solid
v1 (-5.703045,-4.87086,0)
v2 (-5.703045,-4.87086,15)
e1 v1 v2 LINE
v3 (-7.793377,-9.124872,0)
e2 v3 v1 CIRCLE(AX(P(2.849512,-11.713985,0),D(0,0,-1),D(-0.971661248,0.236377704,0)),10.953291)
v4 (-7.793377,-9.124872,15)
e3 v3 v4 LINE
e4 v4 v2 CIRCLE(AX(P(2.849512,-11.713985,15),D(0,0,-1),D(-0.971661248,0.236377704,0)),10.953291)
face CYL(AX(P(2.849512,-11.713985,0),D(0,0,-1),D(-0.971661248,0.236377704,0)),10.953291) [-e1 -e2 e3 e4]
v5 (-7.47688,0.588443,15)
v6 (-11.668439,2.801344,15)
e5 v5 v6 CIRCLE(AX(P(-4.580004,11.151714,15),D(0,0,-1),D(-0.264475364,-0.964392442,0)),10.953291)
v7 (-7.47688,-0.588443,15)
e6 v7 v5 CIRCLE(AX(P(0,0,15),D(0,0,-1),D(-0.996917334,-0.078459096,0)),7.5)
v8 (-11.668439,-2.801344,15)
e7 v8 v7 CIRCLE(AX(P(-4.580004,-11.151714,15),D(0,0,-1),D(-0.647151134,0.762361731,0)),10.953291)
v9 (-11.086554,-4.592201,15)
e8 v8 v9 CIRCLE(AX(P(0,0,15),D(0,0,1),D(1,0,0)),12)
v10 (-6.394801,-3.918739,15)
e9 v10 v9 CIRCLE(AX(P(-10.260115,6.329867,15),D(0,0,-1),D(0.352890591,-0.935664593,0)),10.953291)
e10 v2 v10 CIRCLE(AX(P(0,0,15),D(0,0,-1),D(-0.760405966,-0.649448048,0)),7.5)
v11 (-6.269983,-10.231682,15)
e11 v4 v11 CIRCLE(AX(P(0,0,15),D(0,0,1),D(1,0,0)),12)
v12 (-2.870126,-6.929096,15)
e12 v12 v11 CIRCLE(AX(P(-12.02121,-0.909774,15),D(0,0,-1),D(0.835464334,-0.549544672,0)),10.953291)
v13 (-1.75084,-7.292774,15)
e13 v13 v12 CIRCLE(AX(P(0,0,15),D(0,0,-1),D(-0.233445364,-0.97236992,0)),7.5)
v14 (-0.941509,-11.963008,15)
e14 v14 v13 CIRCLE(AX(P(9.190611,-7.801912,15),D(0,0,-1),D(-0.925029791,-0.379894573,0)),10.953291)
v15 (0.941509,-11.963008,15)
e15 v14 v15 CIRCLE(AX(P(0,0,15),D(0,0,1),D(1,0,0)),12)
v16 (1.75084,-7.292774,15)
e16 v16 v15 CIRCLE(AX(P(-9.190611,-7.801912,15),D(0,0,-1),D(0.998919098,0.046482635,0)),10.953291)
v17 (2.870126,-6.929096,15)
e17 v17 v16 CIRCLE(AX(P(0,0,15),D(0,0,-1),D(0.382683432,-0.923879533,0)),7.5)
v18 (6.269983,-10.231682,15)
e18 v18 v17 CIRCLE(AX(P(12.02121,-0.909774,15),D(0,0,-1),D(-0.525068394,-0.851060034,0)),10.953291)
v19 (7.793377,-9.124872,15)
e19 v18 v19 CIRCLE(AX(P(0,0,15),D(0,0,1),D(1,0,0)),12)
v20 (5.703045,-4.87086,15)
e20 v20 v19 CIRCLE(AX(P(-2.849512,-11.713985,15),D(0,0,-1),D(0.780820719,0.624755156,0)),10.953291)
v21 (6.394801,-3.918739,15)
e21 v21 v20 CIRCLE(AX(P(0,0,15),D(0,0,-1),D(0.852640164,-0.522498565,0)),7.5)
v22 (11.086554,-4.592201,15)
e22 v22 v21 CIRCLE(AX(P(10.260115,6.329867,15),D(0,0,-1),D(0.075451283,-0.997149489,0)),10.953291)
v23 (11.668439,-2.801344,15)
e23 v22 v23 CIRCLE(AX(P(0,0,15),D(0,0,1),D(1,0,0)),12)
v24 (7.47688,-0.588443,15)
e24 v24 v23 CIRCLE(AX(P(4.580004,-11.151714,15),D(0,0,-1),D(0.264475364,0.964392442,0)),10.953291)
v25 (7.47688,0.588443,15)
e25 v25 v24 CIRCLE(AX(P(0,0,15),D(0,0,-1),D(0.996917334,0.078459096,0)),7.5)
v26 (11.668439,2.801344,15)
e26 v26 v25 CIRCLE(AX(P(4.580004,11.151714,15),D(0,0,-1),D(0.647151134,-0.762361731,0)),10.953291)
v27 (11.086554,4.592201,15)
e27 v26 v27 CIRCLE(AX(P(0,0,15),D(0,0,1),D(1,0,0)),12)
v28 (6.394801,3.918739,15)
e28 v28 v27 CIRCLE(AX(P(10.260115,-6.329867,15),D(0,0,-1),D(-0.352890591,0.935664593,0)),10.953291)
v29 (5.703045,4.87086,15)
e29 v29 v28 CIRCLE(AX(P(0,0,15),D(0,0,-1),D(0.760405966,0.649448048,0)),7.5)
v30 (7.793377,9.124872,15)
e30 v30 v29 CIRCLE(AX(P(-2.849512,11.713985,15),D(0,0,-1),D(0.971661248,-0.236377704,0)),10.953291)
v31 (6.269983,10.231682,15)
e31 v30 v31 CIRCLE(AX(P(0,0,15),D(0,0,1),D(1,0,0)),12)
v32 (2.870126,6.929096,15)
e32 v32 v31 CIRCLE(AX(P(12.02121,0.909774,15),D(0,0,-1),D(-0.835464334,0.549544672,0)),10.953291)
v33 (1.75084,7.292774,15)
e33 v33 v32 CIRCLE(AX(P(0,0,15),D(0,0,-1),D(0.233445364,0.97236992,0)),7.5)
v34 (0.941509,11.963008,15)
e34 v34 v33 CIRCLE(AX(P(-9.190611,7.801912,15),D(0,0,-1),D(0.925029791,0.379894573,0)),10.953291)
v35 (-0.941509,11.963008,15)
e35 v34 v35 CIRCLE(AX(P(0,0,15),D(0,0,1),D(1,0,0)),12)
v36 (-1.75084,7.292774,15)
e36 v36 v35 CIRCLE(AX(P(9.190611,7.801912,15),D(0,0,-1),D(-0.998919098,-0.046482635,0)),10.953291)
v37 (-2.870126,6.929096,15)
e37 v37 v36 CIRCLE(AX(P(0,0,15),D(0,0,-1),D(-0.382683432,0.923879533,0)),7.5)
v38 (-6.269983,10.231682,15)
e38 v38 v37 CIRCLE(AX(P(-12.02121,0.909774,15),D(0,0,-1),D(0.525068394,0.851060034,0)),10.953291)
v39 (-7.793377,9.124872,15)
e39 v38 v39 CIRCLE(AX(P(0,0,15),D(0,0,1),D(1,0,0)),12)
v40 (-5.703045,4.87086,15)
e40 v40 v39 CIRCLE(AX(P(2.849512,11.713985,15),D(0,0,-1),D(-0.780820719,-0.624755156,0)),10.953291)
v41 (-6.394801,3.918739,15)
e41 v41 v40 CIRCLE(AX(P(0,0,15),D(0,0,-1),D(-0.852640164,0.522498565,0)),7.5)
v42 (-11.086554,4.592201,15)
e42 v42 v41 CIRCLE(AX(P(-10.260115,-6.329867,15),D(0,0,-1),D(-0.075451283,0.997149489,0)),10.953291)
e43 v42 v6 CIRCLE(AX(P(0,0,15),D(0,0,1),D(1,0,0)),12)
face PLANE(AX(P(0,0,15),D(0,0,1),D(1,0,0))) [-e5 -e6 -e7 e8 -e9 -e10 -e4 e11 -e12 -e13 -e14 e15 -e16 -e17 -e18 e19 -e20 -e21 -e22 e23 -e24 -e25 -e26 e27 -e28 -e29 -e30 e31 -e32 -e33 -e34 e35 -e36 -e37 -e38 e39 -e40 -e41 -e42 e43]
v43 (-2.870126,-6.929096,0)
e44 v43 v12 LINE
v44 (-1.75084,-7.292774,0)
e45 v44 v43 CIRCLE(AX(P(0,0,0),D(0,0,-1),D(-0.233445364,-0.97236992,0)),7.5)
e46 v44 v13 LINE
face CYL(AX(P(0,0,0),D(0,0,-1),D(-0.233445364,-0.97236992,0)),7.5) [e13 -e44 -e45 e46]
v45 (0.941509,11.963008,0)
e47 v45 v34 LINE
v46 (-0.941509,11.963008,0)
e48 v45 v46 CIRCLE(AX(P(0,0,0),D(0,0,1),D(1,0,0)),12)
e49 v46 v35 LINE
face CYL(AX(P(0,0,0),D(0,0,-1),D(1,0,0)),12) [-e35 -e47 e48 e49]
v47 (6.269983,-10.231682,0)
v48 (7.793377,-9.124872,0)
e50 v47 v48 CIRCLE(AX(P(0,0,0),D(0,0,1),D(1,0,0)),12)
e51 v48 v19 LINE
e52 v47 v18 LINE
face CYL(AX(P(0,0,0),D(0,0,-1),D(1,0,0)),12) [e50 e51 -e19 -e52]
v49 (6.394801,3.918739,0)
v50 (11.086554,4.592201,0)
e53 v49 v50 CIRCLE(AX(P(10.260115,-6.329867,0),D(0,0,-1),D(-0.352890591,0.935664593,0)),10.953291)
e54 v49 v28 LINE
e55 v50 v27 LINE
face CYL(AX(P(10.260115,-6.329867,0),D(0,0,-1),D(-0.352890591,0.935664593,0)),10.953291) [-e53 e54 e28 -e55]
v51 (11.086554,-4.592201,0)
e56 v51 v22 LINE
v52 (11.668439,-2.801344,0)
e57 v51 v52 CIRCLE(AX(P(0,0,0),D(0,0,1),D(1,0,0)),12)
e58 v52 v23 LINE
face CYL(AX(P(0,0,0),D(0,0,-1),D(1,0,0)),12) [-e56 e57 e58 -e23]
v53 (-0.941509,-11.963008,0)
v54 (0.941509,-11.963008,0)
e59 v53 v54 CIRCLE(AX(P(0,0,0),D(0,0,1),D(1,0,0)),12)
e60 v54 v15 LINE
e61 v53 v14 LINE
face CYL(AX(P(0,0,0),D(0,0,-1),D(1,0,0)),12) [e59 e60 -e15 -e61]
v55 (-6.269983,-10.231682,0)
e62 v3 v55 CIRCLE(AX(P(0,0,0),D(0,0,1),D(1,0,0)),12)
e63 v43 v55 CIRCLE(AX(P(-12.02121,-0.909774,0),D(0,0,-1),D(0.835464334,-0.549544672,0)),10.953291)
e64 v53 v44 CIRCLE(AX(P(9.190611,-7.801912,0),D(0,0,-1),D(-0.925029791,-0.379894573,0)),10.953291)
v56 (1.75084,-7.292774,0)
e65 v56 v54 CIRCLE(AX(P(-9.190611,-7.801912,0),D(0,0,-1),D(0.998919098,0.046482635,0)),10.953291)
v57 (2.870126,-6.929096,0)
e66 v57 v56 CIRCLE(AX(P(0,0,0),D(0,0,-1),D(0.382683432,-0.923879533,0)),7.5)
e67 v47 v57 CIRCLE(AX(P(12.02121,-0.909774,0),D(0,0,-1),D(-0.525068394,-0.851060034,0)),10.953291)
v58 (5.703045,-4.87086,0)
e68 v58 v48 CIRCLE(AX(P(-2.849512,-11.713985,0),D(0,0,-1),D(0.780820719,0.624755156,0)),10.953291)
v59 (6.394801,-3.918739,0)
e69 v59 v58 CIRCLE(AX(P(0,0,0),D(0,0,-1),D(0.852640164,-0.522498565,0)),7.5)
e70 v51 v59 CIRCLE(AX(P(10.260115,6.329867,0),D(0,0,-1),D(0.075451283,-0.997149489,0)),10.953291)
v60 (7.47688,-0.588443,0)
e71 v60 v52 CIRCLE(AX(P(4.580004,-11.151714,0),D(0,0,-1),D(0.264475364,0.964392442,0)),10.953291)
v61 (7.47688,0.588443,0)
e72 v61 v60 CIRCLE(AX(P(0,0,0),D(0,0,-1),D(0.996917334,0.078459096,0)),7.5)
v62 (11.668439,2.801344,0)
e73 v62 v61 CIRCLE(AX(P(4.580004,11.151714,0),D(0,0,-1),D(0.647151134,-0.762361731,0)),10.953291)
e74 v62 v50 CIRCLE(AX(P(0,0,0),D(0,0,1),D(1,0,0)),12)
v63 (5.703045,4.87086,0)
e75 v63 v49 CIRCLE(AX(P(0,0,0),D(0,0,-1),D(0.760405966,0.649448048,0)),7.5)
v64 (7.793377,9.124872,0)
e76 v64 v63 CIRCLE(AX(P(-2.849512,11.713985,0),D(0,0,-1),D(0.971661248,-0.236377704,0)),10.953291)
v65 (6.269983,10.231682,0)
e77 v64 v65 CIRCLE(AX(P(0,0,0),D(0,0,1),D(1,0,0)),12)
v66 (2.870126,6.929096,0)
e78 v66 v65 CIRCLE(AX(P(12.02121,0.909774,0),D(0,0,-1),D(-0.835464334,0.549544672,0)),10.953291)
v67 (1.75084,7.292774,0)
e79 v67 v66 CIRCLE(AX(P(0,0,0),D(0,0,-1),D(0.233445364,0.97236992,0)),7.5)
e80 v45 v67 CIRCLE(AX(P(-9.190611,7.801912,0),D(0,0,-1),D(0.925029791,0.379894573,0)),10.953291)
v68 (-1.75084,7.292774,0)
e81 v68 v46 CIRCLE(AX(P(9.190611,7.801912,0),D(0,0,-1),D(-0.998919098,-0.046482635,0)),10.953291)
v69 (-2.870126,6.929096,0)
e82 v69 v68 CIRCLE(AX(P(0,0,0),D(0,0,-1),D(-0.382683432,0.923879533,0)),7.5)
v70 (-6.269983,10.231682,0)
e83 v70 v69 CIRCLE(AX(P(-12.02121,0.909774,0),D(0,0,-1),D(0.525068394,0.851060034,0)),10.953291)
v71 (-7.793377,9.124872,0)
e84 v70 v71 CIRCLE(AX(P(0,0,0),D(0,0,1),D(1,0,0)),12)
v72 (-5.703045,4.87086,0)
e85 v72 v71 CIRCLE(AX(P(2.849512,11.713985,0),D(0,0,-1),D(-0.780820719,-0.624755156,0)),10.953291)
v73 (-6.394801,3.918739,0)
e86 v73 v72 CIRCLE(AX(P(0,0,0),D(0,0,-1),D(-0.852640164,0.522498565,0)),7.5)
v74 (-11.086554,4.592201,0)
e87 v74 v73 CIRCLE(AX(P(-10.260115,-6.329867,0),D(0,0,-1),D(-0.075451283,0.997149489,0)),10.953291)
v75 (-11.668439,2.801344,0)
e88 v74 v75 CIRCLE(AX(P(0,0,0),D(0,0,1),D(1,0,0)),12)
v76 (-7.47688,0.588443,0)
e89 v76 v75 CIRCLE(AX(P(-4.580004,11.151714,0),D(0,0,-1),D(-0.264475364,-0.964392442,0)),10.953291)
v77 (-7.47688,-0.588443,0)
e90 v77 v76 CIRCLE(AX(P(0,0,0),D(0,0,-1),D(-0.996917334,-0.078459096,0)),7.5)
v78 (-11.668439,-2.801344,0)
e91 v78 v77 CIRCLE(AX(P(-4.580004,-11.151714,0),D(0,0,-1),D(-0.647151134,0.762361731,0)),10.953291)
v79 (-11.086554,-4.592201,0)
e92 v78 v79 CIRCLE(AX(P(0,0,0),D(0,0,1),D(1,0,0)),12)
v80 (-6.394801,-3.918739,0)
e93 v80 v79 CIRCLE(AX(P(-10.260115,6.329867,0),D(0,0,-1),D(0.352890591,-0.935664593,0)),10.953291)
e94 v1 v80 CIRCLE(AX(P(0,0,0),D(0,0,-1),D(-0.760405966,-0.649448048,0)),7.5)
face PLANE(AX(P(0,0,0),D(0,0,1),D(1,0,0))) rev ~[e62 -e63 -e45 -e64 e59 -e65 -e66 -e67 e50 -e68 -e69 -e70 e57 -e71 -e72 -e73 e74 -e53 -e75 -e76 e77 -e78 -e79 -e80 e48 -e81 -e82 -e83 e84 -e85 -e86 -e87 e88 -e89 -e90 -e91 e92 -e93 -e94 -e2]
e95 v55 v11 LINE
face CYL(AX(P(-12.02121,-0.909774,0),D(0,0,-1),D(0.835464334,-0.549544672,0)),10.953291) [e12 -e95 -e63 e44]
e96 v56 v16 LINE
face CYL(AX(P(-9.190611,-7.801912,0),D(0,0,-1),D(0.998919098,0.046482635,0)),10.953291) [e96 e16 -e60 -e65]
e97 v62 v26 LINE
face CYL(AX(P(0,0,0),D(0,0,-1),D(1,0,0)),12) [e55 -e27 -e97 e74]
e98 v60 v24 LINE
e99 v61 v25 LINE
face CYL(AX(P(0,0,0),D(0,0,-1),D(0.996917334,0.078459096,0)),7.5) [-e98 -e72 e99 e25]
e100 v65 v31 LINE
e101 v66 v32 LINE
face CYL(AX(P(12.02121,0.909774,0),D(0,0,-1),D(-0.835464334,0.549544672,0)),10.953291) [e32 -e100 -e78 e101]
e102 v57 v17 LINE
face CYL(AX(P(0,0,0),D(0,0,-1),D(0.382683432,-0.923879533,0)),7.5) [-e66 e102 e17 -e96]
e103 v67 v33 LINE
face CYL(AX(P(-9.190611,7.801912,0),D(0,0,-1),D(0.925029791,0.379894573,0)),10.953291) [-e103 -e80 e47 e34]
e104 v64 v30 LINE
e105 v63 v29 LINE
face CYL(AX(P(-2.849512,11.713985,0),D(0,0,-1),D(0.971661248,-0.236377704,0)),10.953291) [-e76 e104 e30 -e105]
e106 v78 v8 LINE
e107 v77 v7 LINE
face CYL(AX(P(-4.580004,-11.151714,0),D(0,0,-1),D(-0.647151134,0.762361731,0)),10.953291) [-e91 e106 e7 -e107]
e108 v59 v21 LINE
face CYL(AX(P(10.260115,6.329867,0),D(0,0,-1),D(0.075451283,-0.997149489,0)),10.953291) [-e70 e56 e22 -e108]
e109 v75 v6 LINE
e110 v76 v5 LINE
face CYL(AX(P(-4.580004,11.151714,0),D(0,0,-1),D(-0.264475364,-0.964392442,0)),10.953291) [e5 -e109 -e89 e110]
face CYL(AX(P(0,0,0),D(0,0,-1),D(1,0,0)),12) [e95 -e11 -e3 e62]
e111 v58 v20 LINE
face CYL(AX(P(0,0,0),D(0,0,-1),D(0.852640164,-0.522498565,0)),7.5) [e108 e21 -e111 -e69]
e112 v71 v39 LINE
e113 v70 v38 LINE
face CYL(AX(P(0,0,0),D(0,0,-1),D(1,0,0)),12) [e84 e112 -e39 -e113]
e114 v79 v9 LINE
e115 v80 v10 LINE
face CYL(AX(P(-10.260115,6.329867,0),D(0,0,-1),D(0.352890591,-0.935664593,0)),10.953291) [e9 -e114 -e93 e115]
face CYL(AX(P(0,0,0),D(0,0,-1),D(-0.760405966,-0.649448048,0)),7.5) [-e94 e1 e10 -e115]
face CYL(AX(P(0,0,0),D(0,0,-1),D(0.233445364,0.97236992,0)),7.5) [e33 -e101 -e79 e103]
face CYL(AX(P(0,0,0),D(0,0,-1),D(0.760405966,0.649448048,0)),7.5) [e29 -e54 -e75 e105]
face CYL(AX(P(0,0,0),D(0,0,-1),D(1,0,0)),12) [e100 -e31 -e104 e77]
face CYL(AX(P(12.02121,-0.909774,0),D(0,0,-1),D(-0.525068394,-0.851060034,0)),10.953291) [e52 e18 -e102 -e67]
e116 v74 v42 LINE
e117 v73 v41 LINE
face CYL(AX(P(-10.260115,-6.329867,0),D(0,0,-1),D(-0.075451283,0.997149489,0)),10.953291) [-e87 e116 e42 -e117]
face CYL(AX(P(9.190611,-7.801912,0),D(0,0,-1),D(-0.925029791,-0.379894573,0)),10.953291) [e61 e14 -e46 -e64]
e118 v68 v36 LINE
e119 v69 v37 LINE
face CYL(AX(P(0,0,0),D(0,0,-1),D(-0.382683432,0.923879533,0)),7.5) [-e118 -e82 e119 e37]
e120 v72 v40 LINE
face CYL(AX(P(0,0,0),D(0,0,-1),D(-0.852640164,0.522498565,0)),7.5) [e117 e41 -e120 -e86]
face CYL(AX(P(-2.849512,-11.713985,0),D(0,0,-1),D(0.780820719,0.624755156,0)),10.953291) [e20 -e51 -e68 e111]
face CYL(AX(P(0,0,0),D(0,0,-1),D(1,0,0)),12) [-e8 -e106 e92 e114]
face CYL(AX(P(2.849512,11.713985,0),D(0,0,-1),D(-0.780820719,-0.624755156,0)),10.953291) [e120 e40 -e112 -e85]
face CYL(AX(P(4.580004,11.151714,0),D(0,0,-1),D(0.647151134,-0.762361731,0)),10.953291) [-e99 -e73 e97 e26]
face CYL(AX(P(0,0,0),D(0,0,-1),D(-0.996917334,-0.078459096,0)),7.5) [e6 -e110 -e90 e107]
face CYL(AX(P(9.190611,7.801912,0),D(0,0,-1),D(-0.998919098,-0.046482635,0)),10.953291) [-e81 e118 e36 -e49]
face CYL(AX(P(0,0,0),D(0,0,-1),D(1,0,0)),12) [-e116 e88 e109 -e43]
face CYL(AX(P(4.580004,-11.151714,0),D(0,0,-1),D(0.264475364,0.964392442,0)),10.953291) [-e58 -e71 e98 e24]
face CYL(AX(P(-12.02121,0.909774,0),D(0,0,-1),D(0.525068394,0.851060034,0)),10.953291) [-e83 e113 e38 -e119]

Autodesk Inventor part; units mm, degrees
sketch "Sketch1" plane through (0, 0, 0) normal (0, 0, 1) x (1, 0, 0)
  circle A0 centre (0, 0) radius 12
  dimension "d0" = 24
extrude "Extrusion1" add sketch "Sketch1" along normal blind 15
ref_plane "Work Plane2" through (0, 0, 7.5) normal (0, 0, 1) x (1, 0, 0)
sketch "Sketch2" plane through (0, 0, 0) normal (0, 0, -1) x (-1, 0, 0)
  circle A0 centre (0, 0) radius 12 projected
  circle A1 centre (0, 0) radius 10
  dimension "d3" = 20
surface extrude "Flankendurchmesser" sketch "Sketch2" against normal through all shown no curves A1
ref_plane "Work Plane8" through (0, 0, 0) normal (0.9510565, 0.309017, 0) x (0, 0, 1)
ref_plane "Work Plane9" through (0, 0, 0) normal (1, 0, 0) x (0, 1, 0)
spur gear teeth "Stirnzahnrad" teeth 10 pitch diameter 20 tip diameter 24 root diameter 15 face width 15 start plane through (0, 0, 0) normal (0, 0, -1) x (-1, 0, 0)
equation "\"d0\" = da_da"
equation "\"d1\" = da_b"
equation "\"d3\" = da_d"
equation "\"d16\" = da_aw"
equation "\"d43\" = da_aw"
equation "\"d46\" = da_aw"
equation "\"da_da\" = 24"
equation "\"da_b\" = 15"
equation "\"da_d\" = 20"
equation "\"da_aw\" = 28"
properties part number "Stirnzahnrad1" material "Steel"
